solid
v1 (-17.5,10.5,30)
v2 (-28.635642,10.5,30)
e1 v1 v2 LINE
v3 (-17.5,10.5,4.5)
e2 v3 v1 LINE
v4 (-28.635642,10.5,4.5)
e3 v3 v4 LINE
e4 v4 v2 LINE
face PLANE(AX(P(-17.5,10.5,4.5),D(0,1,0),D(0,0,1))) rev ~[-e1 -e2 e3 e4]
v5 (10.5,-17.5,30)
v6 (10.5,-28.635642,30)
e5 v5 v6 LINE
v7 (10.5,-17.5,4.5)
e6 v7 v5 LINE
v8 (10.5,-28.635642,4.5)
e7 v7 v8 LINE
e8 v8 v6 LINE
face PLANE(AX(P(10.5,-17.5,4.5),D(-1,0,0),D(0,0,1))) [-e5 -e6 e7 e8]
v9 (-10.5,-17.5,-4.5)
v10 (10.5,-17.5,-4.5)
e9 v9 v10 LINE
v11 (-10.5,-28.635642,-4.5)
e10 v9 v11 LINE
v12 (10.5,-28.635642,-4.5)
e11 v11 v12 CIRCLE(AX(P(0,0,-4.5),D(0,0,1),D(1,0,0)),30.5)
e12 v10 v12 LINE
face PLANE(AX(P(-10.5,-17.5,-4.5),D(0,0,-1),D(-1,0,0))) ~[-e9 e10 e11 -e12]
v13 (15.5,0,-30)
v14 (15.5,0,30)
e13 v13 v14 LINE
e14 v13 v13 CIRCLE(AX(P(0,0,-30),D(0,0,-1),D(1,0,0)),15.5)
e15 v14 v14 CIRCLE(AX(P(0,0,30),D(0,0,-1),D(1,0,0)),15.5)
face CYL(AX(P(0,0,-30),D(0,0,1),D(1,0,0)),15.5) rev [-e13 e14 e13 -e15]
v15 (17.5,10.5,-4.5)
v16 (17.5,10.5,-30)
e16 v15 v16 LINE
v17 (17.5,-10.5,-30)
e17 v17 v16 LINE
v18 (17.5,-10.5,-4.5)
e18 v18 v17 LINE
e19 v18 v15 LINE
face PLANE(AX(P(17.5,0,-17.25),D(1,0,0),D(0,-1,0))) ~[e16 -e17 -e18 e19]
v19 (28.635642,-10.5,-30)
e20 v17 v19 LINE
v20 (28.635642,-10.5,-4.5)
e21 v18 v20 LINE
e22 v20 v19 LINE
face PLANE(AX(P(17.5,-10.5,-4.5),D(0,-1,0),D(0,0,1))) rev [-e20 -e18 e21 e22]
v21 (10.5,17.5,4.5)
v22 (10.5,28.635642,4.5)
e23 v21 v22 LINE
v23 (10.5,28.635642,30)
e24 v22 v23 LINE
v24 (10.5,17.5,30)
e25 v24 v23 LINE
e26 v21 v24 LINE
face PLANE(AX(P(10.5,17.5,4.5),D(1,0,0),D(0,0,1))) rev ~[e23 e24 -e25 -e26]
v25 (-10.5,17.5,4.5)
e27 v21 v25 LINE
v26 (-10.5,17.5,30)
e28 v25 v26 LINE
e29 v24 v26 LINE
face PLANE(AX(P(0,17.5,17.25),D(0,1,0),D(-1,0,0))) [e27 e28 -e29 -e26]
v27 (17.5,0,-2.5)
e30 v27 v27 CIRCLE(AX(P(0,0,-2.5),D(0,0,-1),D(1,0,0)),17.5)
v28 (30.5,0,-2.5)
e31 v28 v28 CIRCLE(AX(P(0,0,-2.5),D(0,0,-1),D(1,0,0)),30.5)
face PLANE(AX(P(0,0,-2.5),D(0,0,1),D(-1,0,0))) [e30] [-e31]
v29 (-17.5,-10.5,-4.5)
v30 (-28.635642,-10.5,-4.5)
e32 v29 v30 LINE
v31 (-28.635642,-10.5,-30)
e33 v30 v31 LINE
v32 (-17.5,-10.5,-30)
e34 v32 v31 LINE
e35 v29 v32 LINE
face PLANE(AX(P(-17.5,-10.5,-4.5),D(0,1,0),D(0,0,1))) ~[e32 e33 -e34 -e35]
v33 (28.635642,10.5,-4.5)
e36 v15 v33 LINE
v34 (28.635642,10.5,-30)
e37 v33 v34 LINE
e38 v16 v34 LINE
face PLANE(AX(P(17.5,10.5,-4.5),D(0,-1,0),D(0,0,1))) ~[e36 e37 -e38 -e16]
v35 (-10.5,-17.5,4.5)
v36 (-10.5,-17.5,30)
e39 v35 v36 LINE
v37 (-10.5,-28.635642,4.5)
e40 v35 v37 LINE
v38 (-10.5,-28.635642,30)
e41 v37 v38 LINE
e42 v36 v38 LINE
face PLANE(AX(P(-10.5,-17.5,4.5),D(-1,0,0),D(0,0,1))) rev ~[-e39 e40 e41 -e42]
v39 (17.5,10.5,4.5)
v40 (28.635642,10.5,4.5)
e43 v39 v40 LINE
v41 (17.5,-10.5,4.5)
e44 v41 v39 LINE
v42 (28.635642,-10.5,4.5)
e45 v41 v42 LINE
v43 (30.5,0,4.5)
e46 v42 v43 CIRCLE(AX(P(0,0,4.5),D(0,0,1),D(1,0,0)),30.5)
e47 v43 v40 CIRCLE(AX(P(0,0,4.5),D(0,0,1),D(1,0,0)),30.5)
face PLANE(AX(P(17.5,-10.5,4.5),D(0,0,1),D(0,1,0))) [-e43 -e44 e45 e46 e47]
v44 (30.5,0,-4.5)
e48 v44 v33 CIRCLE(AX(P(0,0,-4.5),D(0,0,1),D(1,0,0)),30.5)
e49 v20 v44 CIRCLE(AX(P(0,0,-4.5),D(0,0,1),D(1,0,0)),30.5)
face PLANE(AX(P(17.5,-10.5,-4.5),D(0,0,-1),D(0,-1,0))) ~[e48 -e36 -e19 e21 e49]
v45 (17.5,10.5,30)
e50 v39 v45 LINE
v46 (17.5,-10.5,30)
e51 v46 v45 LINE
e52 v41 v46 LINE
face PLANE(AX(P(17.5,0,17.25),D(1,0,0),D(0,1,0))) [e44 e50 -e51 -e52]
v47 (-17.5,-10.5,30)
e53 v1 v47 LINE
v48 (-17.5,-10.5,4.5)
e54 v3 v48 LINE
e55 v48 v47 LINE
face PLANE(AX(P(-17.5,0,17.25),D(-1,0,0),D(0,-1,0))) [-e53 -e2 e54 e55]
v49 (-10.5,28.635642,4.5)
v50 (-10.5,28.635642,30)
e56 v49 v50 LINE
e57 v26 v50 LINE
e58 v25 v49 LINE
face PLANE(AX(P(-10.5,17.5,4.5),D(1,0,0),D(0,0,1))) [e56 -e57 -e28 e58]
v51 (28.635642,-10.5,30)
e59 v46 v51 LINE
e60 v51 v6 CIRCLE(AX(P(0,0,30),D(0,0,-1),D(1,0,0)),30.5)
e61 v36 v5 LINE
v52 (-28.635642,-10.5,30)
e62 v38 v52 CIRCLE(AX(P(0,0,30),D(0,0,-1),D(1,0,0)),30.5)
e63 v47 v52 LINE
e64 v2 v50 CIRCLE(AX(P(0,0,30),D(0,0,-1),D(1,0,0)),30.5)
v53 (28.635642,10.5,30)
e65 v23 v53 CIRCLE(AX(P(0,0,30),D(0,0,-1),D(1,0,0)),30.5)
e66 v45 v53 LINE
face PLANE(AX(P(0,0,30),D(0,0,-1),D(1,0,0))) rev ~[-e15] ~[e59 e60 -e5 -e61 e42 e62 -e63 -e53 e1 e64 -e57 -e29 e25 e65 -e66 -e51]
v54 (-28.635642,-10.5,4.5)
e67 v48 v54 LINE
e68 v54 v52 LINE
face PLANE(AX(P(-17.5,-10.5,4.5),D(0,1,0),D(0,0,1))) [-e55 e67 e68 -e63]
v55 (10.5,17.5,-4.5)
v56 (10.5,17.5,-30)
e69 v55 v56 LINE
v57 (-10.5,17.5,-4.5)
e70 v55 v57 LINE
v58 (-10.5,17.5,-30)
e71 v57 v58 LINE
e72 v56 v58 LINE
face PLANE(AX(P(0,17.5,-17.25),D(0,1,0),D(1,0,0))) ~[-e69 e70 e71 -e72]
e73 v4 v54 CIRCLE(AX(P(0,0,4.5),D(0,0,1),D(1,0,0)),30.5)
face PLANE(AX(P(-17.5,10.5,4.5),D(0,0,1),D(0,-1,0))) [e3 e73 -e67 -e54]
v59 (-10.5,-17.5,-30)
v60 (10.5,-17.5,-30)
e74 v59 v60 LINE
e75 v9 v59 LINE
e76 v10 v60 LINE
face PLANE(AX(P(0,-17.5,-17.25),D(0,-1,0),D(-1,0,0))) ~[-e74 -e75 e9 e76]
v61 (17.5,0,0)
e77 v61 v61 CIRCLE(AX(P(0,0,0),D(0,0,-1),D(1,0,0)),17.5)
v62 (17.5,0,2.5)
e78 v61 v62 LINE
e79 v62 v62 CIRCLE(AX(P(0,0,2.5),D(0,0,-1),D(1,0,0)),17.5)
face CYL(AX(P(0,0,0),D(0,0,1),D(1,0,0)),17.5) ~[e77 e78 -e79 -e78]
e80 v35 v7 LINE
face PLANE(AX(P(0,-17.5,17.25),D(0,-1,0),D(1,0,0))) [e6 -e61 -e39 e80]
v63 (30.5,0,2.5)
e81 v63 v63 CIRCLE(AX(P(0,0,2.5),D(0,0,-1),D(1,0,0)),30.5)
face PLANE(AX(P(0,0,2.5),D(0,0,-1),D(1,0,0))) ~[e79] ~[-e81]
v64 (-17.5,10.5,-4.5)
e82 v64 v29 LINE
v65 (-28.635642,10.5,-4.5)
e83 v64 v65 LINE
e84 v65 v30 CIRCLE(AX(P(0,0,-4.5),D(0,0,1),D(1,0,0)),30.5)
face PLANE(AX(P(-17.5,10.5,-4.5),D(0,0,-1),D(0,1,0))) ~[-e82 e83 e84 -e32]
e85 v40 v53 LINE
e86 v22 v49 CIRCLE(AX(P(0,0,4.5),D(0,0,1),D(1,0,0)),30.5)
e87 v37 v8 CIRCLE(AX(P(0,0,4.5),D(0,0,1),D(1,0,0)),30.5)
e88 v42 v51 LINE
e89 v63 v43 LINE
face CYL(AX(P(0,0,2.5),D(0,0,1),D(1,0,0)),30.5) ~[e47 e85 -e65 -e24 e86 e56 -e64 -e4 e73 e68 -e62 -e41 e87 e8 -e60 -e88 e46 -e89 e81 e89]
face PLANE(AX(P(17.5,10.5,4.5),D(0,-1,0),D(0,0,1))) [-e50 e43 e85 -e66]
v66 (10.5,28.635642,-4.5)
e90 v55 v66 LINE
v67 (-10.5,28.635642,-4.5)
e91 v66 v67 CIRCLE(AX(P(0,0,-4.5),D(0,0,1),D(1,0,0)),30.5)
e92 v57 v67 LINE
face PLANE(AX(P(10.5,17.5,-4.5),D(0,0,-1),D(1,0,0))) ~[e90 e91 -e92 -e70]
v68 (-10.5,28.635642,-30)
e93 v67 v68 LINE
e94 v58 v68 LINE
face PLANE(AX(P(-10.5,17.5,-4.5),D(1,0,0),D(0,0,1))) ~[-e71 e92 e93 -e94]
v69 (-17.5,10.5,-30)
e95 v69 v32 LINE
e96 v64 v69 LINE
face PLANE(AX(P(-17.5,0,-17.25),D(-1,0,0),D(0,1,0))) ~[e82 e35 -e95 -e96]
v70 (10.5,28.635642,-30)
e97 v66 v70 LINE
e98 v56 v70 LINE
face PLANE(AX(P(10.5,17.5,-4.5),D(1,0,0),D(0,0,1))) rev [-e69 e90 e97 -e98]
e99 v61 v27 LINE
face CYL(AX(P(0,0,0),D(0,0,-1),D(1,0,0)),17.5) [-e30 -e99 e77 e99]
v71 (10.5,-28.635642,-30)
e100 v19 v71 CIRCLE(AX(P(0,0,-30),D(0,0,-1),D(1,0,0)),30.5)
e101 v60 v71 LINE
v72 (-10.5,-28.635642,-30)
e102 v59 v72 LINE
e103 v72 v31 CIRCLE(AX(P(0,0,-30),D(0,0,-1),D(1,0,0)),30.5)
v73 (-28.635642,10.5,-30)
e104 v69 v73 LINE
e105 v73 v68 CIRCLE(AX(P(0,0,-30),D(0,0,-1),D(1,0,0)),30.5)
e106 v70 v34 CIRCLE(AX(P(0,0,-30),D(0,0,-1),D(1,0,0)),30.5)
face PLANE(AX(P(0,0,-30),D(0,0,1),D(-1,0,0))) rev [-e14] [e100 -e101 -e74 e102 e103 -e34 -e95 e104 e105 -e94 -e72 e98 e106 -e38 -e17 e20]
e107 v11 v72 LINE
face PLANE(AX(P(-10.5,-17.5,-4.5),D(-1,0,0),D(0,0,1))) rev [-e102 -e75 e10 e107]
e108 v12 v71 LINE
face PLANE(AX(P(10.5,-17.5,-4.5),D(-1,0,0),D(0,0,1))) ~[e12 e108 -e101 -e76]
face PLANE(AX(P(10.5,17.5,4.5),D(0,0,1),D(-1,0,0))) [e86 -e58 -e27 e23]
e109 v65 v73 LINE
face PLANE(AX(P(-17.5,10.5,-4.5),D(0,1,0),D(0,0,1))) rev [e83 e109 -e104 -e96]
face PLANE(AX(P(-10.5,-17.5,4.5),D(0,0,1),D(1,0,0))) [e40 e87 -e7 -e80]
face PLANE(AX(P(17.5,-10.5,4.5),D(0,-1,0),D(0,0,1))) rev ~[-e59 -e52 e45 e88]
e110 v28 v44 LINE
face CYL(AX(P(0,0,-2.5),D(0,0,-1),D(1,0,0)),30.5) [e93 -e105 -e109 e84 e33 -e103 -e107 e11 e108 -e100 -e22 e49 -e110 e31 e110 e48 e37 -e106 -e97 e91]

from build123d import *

# Parameters (mm, degrees)
F4_W            = 21
F4_H            = 25.5
F6_DEPTH        = 13.001
F6_COPIES_COUNT = 4


# Not quite as in the source:
# - a pattern or mirror of a feature is missing from the dataset's text; its kind, count and spacing are read off the source's solid


with BuildPart() as f5:
    # F2 (on Front) → F5 (revolve)
    with BuildSketch(Plane.XZ):
        Polygon((15.5, 30), (15.5, 0), (17.5, 0), (17.5, 2.5), (30.5, 2.5), (30.5, 30), align=None)
    revolve(axis=Axis((0, 0, 6.4842129506), (0, 0, -1)))

    # F4 (on offset) → F6 (cut, through all)
    with BuildSketch(Plane.YZ.offset(17.5)):
        with Locations((0, 17.25)):
            Rectangle(F4_W, F4_H)
    f6 = extrude(amount=F6_DEPTH, mode=Mode.SUBTRACT)

    # F6_copies: F6 ×4 about axis
    f6_copies_axis = Axis((0, 0, 0), (0, 0, 1))
    for i in range(1, F6_COPIES_COUNT):
        add(f6.rotate(f6_copies_axis, i * 360 / F6_COPIES_COUNT), mode=Mode.SUBTRACT)

    # F7: F5 across plane


with BuildPart() as f5_1:
    add(f5.part)
    add(f5.part.mirror(Plane.XY))


solid = f5_1.part
